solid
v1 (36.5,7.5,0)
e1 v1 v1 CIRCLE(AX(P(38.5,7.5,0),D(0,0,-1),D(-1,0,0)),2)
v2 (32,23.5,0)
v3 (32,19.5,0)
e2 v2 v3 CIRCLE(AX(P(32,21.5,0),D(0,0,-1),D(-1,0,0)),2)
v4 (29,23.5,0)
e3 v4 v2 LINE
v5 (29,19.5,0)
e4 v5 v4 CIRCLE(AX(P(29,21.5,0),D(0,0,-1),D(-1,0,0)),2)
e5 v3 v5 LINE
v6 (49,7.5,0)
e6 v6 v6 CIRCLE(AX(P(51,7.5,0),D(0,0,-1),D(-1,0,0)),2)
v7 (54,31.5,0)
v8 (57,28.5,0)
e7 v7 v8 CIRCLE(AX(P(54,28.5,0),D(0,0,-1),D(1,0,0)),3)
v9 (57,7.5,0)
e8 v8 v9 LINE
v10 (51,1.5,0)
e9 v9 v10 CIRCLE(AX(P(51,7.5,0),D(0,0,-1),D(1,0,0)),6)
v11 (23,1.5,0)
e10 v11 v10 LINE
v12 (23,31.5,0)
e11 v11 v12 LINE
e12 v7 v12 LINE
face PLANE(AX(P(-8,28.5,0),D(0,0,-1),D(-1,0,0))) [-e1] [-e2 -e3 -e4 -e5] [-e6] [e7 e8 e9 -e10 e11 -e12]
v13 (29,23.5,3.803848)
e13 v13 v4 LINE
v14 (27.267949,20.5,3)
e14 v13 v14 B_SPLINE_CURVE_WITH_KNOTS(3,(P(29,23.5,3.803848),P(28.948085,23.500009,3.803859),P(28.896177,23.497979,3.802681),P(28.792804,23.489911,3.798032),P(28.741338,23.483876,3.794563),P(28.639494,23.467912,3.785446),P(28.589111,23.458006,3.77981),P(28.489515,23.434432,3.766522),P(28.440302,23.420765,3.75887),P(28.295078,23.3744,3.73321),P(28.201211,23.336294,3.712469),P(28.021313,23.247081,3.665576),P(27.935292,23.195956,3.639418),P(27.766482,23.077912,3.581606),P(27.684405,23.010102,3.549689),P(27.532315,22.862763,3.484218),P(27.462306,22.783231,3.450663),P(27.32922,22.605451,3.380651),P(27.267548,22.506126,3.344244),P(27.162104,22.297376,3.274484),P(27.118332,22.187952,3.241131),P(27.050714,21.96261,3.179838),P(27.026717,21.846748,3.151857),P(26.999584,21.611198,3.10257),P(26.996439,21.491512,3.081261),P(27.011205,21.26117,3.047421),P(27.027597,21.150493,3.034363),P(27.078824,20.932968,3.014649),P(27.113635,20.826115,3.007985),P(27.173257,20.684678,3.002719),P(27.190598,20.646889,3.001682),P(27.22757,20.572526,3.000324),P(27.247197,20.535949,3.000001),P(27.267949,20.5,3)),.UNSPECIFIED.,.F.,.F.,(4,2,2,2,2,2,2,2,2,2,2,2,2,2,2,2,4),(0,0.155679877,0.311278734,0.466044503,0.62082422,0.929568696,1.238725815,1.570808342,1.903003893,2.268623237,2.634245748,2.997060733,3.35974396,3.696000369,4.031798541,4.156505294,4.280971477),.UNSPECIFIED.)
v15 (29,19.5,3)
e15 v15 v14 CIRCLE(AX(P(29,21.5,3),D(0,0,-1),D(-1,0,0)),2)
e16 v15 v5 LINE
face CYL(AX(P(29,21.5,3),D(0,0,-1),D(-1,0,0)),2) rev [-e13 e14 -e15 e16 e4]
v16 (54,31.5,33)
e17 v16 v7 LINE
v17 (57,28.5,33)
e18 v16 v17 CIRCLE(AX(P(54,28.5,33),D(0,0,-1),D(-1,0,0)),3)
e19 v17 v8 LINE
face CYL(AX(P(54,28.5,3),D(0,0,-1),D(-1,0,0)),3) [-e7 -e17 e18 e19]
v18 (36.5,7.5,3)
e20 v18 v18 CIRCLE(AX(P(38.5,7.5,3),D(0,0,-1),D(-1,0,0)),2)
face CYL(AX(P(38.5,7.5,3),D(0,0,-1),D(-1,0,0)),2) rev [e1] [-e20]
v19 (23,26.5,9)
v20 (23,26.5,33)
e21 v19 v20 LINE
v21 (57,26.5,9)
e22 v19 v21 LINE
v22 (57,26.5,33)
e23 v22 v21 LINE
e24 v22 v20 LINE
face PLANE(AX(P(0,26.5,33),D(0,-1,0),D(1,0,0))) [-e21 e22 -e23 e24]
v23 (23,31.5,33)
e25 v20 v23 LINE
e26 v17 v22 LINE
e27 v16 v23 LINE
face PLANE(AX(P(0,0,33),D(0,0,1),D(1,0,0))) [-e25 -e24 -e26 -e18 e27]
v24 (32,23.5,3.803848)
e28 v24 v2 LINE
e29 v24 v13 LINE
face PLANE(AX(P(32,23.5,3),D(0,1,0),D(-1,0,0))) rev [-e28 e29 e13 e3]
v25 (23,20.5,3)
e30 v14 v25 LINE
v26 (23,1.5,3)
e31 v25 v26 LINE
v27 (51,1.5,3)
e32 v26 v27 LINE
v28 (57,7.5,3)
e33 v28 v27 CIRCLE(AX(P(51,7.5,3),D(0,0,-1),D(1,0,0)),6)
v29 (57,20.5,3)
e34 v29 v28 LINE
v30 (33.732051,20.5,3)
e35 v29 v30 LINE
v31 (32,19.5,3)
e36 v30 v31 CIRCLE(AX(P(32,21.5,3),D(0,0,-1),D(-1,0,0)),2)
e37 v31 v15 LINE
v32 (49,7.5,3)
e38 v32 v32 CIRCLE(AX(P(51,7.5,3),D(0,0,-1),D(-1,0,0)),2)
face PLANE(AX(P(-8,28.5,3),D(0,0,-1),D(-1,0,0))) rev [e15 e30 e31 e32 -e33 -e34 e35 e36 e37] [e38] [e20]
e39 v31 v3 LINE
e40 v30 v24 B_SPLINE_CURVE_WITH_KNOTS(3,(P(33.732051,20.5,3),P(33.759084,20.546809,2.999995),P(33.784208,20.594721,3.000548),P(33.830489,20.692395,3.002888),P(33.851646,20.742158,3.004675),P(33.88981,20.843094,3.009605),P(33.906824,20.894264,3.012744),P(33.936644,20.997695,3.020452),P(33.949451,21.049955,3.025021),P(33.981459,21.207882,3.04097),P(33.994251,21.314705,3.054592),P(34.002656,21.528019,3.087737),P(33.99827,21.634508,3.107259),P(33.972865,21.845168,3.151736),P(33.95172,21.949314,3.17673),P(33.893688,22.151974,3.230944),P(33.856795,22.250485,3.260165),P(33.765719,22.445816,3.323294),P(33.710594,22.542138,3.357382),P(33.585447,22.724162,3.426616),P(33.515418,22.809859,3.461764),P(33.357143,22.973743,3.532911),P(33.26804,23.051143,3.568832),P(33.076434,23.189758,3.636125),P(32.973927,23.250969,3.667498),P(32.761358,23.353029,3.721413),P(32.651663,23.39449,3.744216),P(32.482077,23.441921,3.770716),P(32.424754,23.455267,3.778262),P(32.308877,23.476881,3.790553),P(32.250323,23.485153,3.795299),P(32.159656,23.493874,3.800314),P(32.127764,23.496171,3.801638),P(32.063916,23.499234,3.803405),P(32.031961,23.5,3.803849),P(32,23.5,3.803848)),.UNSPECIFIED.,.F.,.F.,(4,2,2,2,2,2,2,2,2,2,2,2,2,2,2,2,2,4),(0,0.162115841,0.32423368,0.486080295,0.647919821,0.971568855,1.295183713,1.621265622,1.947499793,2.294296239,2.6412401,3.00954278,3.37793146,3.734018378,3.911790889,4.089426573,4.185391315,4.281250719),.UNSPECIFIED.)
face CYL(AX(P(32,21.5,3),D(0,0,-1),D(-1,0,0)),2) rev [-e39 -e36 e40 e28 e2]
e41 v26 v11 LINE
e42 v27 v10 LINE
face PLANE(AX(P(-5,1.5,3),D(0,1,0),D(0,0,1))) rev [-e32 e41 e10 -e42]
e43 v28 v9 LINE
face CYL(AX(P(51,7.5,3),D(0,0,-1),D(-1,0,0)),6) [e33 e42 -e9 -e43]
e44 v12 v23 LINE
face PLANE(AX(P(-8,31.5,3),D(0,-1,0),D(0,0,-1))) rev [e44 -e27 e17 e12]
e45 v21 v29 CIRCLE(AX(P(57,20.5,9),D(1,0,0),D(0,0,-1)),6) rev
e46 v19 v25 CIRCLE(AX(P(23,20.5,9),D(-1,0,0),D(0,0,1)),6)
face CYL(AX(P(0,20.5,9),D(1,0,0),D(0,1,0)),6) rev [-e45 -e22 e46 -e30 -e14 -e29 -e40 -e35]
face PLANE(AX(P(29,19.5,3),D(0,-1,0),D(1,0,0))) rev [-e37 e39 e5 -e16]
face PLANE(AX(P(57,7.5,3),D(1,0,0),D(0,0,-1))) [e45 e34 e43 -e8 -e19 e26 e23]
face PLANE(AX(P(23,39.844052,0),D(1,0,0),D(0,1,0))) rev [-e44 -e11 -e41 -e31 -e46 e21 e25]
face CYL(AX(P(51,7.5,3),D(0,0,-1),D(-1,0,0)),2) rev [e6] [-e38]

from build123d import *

# Parameters (mm, degrees)
ESQUISSE1_R                  = 2
BOSS_EXTRU_1_DEPTH           = 3
BOSS_EXTRU_2_DEPTH           = 30
CONG_1_START                 = -11
CONG_1_DEPTH                 = 34
CONG_1_2_DEPTH               = 25
CONG_1_START_2               = 16.9999999
CONG_1_3_DEPTH               = 6.0000001
CONG_1_START_3               = 3
CONG_1_4_DEPTH               = 2
ENL_V_MAT_EXTRU_1_DEPTH      = 74.008561265
ENL_V_MAT_EXTRU_1_DEPTH_BACK = 74.008561265
ESQUISSE3_W                  = 37.381504973
ESQUISSE3_H                  = 48.316758503


with BuildPart() as part:
    # Esquisse1 → Boss.-Extru.1 (new body)
    with BuildSketch(Plane.XY):
        with BuildLine():
            Line((-5, 1.5), (23, 1.5))
            Line((23, 1.5), (23, 31.5))
            Line((23, 31.5), (-8, 31.5))
            ThreePointArc((-8, 31.5), (-10.121320344, 30.621320344), (-11, 28.5))
            Line((-11, 28.5), (-11, 7.5))
            ThreePointArc((-11, 7.5), (-9.242640687, 3.257359313), (-5, 1.5))
        make_face()
        with Locations((-5, 7.5)):
            Circle(ESQUISSE1_R, mode=Mode.SUBTRACT)
        with Locations((7.5, 7.5)):
            Circle(ESQUISSE1_R, mode=Mode.SUBTRACT)
        with BuildLine():
            Line((14, 23.5), (17, 23.5))
            ThreePointArc((17, 23.5), (19, 21.5), (17, 19.5))
            Line((17, 19.5), (14, 19.5))
            ThreePointArc((14, 19.5), (12, 21.5), (14, 23.5))
        make_face(mode=Mode.SUBTRACT)
    boss_extru_1 = extrude(amount=BOSS_EXTRU_1_DEPTH)

    # Esquisse2 → Boss.-Extru.2 (add)
    with BuildSketch(Plane.XY.offset(3)):
        with BuildLine():
            Line((23, 31.5), (-8, 31.5))
            ThreePointArc((-8, 31.5), (-10.121320344, 30.621320344), (-11, 28.5))
            Line((-11, 28.5), (-11, 26.5))
            Line((-11, 26.5), (23, 26.5))
            Line((23, 26.5), (23, 31.5))
        make_face()
    boss_extru_2 = extrude(amount=BOSS_EXTRU_2_DEPTH)

    # Congé1: read off the stored shape, not the designer's step
    # Congé1 outline → Congé1 (add)
    with BuildSketch(Plane.YZ.offset(CONG_1_START)):
        with BuildLine():
            ThreePointArc((26.5, 9), (25.696152423, 6), (23.5, 3.803847577))
            Line((23.5, 3.803847577), (23.5, 3))
            Line((23.5, 3), (26.5, 3))
            Line((26.5, 3), (26.5, 9))
        make_face()
    cong_1 = extrude(amount=CONG_1_DEPTH)

    # Cong_1 2 outline → Cong_1 2 (add)
    with BuildSketch(Plane.YZ.offset(CONG_1_START)):
        with BuildLine():
            Line((23.5, 3), (23.5, 3.803847577))
            ThreePointArc((23.5, 3.803847577), (22.052914271, 3.204445042), (20.5, 3))
            Line((20.5, 3), (23.5, 3))
        make_face()
    cong_1_2 = extrude(amount=CONG_1_2_DEPTH)

    # Cong_1 3 outline → Cong_1 3 (add)
    with BuildSketch(Plane.YZ.offset(CONG_1_START_2)):
        with BuildLine():
            Line((23.5, 3), (23.5, 3.803847577))
            ThreePointArc((23.5, 3.803847577), (22.052914271, 3.204445042), (20.5, 3))
            Line((20.5, 3), (23.5, 3))
        make_face()
    cong_1_3 = extrude(amount=CONG_1_3_DEPTH)

    # Cong_1 4 outline → Cong_1 4 (cut)
    with BuildSketch(Plane.XY.offset(CONG_1_START_3)):
        with BuildLine():
            Line((17, 23.5), (17, 19.5))
            ThreePointArc((17, 19.5), (19, 21.5), (17, 23.5))
        make_face()
        with BuildLine():
            ThreePointArc((14, 23.5), (12, 21.5), (14, 19.5))
            Line((14, 19.5), (14, 23.5))
        make_face()
    cong_1_4 = extrude(amount=CONG_1_4_DEPTH, mode=Mode.SUBTRACT)

    # Symétrie1: Boss.-Extru.1, Boss.-Extru.2, Congé1, Cong_1 2, Cong_1 3, Cong_1 4 across plane
    add(boss_extru_1.mirror(Plane(origin=(23, 1.5, 3), x_dir=(0, 0, 1), z_dir=(-1, 0, 0))))
    add(boss_extru_2.mirror(Plane(origin=(23, 1.5, 3), x_dir=(0, 0, 1), z_dir=(-1, 0, 0))))
    add(cong_1.mirror(Plane(origin=(23, 1.5, 3), x_dir=(0, 0, 1), z_dir=(-1, 0, 0))))
    add(cong_1_2.mirror(Plane(origin=(23, 1.5, 3), x_dir=(0, 0, 1), z_dir=(-1, 0, 0))))
    add(cong_1_3.mirror(Plane(origin=(23, 1.5, 3), x_dir=(0, 0, 1), z_dir=(-1, 0, 0))))
    add(cong_1_4.mirror(Plane(origin=(23, 1.5, 3), x_dir=(0, 0, 1), z_dir=(-1, 0, 0))), mode=Mode.SUBTRACT)

    # Esquisse3 → Enlèv. mat.-Extru.1 (cut, two sides: drawn at the far end of the back side and taken through both)
    with BuildSketch(Plane.XY.offset(33).offset(-ENL_V_MAT_EXTRU_1_DEPTH_BACK)):
        with Locations((4.309247513, 15.68567261)):
            Rectangle(ESQUISSE3_W, ESQUISSE3_H)
    extrude(amount=ENL_V_MAT_EXTRU_1_DEPTH + ENL_V_MAT_EXTRU_1_DEPTH_BACK, mode=Mode.SUBTRACT)


solid = part.part
